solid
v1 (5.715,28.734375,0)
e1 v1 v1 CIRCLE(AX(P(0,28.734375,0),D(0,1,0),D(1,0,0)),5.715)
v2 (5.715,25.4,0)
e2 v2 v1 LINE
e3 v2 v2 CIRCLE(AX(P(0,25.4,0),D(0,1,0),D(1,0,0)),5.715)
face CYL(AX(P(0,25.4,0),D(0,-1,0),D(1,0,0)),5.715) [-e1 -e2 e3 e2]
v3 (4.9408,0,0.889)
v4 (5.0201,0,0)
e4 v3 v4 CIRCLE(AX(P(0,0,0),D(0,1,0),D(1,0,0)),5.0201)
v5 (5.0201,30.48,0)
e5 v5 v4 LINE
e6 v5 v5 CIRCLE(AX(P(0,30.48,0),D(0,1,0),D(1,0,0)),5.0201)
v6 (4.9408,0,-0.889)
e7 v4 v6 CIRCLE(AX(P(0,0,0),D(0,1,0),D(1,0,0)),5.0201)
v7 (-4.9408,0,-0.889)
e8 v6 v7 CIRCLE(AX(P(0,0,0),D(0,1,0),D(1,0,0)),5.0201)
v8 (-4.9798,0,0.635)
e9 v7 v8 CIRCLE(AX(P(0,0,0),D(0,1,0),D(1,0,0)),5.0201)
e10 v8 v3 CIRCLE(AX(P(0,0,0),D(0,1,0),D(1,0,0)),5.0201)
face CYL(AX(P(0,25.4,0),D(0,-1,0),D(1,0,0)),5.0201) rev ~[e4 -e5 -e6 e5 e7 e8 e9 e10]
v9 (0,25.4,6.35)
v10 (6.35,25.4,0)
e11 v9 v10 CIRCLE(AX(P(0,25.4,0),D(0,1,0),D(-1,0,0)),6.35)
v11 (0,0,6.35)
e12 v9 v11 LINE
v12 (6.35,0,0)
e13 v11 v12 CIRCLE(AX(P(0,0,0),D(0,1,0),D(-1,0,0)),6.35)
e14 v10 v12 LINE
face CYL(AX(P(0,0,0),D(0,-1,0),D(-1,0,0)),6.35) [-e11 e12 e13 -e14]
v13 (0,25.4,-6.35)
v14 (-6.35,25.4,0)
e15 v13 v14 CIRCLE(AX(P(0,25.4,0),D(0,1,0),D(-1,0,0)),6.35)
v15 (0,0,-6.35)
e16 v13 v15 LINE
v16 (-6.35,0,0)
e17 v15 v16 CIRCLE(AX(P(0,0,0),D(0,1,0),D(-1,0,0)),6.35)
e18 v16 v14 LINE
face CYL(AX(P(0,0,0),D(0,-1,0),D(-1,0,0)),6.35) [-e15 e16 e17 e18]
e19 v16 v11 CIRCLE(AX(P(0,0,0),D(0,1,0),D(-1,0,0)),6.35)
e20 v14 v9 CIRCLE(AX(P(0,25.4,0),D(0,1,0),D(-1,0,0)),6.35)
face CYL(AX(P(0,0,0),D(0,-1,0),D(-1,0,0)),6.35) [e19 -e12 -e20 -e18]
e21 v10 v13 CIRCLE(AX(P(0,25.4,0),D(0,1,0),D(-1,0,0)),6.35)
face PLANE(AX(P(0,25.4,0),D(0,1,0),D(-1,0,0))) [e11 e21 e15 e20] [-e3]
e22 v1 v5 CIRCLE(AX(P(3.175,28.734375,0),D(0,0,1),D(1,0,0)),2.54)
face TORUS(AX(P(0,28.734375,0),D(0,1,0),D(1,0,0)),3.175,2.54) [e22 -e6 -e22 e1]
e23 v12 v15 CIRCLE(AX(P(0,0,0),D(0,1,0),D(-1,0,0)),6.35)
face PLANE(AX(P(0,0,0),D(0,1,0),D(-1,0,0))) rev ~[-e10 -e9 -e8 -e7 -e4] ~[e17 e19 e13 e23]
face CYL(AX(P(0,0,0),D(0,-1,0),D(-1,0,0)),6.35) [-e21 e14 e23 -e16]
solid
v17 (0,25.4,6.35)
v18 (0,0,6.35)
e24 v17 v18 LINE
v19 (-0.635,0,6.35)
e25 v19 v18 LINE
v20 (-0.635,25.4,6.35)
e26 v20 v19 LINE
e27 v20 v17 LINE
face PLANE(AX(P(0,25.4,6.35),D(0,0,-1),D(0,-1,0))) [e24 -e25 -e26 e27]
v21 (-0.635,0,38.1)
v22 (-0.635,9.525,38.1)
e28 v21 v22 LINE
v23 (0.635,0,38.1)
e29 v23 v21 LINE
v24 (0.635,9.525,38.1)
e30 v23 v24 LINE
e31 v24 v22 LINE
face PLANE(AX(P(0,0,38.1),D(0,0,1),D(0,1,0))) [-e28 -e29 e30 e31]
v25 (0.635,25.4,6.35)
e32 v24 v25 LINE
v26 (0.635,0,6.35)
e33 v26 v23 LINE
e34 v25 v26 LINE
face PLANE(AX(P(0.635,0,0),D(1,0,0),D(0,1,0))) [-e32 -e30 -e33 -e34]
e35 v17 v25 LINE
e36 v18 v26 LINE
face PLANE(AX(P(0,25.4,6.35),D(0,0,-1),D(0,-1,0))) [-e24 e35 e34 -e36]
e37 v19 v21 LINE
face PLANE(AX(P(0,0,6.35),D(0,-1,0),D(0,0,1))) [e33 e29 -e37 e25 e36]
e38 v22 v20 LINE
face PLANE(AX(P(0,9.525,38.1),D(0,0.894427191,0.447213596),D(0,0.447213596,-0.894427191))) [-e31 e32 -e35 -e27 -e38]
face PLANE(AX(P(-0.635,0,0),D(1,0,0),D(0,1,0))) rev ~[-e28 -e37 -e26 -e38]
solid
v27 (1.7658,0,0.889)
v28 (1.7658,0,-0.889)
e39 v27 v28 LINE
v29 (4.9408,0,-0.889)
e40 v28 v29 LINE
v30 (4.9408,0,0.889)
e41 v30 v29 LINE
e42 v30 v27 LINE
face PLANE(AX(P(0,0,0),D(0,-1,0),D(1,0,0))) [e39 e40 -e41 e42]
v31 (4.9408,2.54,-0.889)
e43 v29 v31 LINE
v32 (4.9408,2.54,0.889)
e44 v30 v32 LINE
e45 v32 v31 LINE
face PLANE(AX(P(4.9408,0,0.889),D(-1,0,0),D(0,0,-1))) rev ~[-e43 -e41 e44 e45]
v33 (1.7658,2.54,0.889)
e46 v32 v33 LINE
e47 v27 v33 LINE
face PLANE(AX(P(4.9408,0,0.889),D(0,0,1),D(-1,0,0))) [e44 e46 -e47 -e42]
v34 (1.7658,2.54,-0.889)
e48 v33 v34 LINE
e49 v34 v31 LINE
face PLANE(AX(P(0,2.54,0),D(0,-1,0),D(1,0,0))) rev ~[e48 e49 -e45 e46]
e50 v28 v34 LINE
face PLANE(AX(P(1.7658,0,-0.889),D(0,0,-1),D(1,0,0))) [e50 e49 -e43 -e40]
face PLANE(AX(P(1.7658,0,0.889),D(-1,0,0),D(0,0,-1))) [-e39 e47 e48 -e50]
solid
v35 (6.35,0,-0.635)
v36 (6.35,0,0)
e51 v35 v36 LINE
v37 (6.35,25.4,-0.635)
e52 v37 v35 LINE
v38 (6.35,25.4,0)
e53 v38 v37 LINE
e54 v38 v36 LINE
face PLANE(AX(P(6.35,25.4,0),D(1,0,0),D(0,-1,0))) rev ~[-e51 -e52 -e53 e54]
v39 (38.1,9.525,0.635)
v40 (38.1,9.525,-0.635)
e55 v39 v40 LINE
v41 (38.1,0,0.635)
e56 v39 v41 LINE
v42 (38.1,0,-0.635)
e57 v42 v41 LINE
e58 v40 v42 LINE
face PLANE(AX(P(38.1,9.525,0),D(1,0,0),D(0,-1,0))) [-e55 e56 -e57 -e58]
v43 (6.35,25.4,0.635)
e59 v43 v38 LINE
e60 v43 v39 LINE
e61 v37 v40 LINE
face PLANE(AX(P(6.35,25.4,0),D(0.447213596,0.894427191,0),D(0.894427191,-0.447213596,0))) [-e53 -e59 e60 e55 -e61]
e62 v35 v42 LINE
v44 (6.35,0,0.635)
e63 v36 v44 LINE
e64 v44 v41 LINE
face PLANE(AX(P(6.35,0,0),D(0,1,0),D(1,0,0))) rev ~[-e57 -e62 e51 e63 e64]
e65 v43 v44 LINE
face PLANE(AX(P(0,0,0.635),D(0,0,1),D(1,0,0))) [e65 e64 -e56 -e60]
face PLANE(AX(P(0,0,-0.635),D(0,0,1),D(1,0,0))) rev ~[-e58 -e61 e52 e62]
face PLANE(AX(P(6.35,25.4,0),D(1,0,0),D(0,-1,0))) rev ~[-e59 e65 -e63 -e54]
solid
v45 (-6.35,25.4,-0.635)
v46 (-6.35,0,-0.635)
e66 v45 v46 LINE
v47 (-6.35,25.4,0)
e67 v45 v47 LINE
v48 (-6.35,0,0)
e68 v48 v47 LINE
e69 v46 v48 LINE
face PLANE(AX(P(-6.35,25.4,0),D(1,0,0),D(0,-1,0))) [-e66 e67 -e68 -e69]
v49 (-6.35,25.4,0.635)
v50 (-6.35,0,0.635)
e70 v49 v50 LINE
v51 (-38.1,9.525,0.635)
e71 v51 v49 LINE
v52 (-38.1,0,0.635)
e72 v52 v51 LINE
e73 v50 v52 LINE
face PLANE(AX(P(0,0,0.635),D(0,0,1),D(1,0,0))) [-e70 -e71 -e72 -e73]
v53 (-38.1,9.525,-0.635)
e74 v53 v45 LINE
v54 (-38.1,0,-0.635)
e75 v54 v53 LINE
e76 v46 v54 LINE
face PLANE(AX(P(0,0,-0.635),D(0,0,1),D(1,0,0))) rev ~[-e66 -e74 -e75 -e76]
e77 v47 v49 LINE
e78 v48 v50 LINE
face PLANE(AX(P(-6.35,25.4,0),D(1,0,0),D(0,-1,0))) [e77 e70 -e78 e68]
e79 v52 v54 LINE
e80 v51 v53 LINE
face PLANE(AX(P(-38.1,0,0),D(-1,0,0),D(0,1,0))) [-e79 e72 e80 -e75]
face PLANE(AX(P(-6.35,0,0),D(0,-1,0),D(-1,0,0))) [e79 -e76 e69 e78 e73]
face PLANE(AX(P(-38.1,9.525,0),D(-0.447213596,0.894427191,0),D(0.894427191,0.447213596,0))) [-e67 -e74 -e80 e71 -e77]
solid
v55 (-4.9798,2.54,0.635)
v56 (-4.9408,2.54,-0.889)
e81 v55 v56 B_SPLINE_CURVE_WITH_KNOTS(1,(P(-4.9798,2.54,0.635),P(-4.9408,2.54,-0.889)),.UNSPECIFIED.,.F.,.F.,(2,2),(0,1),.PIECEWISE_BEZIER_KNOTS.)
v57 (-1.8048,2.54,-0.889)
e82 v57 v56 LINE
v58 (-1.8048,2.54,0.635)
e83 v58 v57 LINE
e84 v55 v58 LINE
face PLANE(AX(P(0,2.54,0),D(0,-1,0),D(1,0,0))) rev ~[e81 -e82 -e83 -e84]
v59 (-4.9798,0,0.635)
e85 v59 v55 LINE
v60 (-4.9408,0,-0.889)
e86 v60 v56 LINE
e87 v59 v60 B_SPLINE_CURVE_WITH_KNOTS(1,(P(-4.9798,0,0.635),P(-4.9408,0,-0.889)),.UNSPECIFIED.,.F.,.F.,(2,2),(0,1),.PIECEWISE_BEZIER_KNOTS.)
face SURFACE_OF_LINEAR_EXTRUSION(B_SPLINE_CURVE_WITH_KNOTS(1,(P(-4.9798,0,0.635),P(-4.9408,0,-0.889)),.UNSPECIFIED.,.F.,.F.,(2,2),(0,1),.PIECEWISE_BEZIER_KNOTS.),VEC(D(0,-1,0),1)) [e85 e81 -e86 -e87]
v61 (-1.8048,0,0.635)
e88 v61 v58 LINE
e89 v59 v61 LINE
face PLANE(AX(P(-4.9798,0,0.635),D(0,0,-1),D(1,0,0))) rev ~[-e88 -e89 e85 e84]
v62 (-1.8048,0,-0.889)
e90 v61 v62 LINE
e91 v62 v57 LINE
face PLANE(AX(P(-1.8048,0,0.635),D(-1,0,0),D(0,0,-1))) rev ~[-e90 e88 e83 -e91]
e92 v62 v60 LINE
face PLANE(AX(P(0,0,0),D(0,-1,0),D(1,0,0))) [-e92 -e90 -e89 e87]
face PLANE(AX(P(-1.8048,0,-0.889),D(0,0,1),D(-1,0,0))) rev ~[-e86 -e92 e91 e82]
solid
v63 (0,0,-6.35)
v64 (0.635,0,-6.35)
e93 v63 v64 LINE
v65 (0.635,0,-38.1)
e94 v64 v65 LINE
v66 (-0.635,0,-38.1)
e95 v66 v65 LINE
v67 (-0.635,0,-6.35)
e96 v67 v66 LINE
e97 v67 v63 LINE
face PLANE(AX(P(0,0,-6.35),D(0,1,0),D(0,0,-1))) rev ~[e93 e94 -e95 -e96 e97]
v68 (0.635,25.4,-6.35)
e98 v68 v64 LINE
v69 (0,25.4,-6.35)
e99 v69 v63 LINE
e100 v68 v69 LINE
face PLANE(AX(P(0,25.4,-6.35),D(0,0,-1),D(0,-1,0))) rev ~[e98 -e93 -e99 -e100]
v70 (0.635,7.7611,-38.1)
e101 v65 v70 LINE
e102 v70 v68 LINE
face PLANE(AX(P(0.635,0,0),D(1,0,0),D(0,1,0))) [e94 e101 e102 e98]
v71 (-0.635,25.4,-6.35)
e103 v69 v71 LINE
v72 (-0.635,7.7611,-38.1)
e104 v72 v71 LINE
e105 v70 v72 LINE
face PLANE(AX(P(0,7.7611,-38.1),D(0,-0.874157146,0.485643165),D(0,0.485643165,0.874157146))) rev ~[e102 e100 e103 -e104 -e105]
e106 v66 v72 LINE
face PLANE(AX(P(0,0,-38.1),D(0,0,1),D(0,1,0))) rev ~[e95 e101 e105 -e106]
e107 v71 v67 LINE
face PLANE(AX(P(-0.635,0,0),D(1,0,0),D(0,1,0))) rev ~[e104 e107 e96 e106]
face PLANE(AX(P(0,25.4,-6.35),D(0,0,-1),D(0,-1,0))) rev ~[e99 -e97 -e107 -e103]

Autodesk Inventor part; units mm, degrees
ref_plane "YZ Plane" through (0, 0, 0) normal (1, 0, 0) x (0, 1, 0)
ref_plane "XZ Plane" through (0, 0, 0) normal (0, 1, 0) x (-1, 0, 0)
ref_plane "XY Plane" through (0, 0, 0) normal (0, 0, 1) x (1, 0, 0)
sketch "Sketch1" plane through (0, 0, 0) normal (0, 1, 0) x (-1, 0, 0)
  circle A0 centre (0, 0) radius 6.35
  dimension "d0" = 12.7
extrude "Extrusion1" add sketch "Sketch1" along normal blind 25.4
sketch "Sketch2" plane through (0, 25.4, 0) normal (0, 1, 0) x (1, 0, 0)
  circle A0 centre (0, 0) radius 5.715
  circle A1 centre (0, 0) radius 5.0201
  dimension "d3" = 11.43
extrude "Extrusion2" cut sketch "Sketch2" against normal blind 25.4 contours A1
extrude "Extrusion3" add sketch "Sketch2" along normal blind 5.08
fillet "Fillet1" radius 2.54 1 edges at (-5.715, 30.48, 0)
sketch "Sketch3" plane through (0, 0, 0) normal (0, 1, 0) x (-1, 0, 0)
  point P0 (0, 0)
sketch "Sketch4" plane through (0, 0, 0) normal (0, 0, 1) x (1, 0, 0)
  line L0 (-6.35, 0) -> (6.35, 0) projected
  line L1 (6.35, 0) -> (38.1, 0)
  line L2 (-6.35, 0) -> (-38.1, 0)
  line L3 (-38.1, 0) -> (-38.1, 9.525)
  line L4 (6.35, 25.4) -> (-6.35, 25.4) projected
  line L5 (-38.1, 9.525) -> (-6.35, 25.4)
  line L6 (-6.35, 25.4) -> (-6.35, 0)
  line L7 (6.35, 25.4) -> (6.35, 0)
  line L8 (6.35, 25.4) -> (38.1, 9.525)
  line L9 (38.1, 9.525) -> (38.1, 0)
  point P0 (0, 0)
  dimension "d9" = 31.75
  dimension "d10" = 31.75
extrude "Extrusion4" add sketch "Sketch4" along normal mid plane 1.27 contours L2 L3 L5 L6 | L7 L8 L9 L1
sketch "Sketch5" plane through (0, 0, 0) normal (1, 0, 0) x (0, 1, 0)
  line L0 (0, -6.35) -> (0, -38.1)
  line L1 (0, -38.1) -> (7.7611, -38.1)
  line L2 (25.4, -6.35) -> (25.4, 0) projected
  line L3 (7.7611, -38.1) -> (25.4, -6.35)
  line L4 (25.4, -6.35) -> (0, -6.35)
  line L5 (0, -6.35) -> (25.4, -6.35) projected
  line L6 (0, 6.35) -> (0, 38.1)
  line L7 (0, 38.1) -> (9.525, 38.1)
  line L8 (25.4, 0) -> (25.4, 6.35) projected
  line L9 (9.525, 38.1) -> (25.4, 6.35)
  line L10 (25.4, 6.35) -> (0, 6.35)
  point P0 (0, 0)
  dimension "d15" = 31.75
  dimension "d16" = 31.75
extrude "Extrusion5" add sketch "Sketch5" along normal mid plane 1.27
sketch "Sketch6" plane through (0, 0, 0) normal (0, -1, 0) x (1, 0, 0)
  circle A0 centre (0, 0) radius 5.0201 projected
  line L0 (-4.9798, 0.635) -> (-1.8048, 0.635)
  line L1 (-6.35, 0.635) -> (-38.1, 0.635) projected
  line L2 (-1.8048, 0.635) -> (-1.8048, -0.889)
  line L3 (-1.8048, -0.889) -> (-4.9408, -0.889)
  spline S0 degree 1 poles (-4.9798, 0.635) (-4.9408, -0.889) knots 0 0 1 1
  line L4 (4.9408, 0.889) -> (1.7658, 0.889)
  line L5 (1.7658, 0.889) -> (1.7658, -0.889)
  line L6 (1.7658, -0.889) -> (4.9408, -0.889)
  line L7 (4.9408, 0.889) -> (4.9408, -0.889)
  dimension "d17" = 3.175
  dimension "d18" = 1.524
  dimension "d19" = 3.175
extrude "Extrusion6" add sketch "Sketch6" against normal blind 2.54 contours L7 L6 L5 L4 | L0 L2 L3 S0
properties part number "Rocket - Base Assembled"
